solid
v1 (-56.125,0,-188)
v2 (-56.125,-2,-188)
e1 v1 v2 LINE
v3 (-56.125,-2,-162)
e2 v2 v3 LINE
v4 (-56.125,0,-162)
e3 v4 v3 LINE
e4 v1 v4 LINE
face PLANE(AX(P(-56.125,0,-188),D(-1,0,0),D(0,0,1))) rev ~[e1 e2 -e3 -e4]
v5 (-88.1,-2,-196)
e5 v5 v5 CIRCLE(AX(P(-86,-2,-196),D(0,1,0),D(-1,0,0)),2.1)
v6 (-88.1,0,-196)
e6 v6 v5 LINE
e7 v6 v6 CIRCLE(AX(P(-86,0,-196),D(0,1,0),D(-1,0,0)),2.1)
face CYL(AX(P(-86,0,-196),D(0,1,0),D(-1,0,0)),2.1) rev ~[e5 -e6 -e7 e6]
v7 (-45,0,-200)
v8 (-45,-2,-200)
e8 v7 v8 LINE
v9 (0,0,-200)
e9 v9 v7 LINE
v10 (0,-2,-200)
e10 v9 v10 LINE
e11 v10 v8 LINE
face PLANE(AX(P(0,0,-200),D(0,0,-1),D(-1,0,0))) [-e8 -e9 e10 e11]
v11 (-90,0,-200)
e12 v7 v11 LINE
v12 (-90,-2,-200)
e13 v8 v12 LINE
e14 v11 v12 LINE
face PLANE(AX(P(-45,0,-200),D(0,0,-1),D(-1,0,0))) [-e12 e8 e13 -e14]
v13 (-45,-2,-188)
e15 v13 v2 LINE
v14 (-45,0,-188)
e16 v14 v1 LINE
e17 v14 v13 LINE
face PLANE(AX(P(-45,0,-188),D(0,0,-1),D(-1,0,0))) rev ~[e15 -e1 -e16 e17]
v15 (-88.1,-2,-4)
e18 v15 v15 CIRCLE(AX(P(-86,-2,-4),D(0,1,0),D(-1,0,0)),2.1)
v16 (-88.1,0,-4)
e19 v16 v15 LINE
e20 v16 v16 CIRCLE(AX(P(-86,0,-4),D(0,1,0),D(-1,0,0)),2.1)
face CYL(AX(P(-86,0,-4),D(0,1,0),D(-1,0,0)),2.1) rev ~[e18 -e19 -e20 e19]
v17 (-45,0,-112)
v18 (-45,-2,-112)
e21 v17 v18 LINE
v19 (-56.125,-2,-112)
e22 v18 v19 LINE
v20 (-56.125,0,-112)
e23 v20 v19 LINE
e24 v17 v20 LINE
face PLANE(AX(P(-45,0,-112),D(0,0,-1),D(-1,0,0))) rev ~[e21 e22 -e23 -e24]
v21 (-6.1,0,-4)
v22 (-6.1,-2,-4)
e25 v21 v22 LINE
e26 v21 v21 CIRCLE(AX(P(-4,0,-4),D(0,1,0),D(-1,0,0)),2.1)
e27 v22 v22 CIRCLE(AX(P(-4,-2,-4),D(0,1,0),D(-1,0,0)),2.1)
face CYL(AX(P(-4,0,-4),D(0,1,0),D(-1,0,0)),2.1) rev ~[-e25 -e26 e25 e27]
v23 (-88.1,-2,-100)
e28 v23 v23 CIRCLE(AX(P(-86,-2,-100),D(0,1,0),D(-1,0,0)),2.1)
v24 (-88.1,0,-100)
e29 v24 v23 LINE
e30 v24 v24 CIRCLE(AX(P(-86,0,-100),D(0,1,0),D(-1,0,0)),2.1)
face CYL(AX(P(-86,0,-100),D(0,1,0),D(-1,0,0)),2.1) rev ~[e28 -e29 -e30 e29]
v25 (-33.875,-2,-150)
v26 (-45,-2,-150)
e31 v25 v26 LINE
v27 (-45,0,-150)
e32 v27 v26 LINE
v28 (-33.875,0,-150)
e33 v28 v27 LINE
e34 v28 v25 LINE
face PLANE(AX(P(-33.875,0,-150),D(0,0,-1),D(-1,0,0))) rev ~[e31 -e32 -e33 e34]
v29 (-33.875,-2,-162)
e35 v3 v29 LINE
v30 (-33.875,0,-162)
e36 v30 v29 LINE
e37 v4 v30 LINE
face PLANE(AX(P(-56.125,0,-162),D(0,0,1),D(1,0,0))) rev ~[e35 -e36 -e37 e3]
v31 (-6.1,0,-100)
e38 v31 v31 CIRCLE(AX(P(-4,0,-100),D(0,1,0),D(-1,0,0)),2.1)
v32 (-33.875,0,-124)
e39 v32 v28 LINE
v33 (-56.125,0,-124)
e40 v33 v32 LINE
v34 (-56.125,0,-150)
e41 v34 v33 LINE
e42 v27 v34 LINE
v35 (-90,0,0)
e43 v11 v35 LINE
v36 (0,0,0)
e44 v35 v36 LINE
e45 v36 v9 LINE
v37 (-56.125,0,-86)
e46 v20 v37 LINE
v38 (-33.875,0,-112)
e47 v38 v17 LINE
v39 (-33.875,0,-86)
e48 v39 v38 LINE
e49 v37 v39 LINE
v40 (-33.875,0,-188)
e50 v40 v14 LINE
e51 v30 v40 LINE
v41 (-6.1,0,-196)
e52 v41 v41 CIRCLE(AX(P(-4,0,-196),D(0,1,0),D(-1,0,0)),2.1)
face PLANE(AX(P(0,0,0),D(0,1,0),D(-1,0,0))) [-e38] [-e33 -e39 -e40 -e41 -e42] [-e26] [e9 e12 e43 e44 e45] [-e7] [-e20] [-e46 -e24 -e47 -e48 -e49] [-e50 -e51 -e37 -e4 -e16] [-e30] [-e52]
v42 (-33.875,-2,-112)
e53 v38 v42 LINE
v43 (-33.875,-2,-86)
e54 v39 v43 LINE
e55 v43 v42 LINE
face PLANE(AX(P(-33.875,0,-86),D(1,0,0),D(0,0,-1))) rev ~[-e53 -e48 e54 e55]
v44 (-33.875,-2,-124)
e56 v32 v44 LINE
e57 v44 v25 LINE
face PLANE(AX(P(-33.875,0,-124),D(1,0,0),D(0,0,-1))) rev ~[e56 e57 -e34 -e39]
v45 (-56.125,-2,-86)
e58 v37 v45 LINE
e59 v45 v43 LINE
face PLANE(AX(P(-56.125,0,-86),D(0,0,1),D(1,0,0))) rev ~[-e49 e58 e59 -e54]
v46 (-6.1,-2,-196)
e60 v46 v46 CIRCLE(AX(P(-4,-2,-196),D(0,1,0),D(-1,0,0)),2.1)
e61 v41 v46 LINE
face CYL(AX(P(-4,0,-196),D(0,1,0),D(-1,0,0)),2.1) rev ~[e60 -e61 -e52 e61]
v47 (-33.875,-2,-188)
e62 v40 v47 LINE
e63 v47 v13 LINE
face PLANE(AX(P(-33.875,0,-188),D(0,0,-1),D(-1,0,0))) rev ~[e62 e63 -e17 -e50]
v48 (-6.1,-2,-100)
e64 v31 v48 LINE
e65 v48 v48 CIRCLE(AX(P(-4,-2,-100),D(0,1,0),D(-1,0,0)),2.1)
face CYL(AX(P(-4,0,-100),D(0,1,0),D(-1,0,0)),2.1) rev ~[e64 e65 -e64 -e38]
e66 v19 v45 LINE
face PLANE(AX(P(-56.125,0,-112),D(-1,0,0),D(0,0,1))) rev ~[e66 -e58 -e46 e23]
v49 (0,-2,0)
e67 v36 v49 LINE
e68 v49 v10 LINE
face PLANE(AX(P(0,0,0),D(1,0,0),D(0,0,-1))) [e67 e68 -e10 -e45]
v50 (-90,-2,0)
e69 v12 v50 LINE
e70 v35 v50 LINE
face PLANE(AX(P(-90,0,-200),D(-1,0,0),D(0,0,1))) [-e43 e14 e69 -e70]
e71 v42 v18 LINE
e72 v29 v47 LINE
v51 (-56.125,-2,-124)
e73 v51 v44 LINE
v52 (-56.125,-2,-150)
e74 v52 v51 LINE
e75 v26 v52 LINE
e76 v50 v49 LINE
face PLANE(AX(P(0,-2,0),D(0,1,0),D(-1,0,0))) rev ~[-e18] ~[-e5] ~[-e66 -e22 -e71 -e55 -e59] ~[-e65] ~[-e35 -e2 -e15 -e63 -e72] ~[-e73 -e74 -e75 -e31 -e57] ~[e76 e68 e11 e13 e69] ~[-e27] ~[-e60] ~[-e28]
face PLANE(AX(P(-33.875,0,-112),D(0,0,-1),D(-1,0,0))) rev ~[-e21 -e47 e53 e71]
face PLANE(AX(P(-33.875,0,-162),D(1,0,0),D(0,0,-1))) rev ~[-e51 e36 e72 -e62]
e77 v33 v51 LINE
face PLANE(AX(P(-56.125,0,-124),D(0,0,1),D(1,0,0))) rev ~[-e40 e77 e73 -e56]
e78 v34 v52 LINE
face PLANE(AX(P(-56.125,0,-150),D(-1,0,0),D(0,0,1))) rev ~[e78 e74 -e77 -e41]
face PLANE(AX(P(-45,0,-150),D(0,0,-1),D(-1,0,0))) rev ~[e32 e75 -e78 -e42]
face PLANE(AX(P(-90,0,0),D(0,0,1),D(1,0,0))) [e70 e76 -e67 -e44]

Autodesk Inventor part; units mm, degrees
ref_plane "YZ Plane" through (0, 0, 0) normal (1, 0, 0) x (0, 1, 0)
ref_plane "XZ Plane" through (0, 0, 0) normal (0, 1, 0) x (-1, 0, 0)
ref_plane "XY Plane" through (0, 0, 0) normal (0, 0, 1) x (1, 0, 0)
sketch "Sketch1" plane through (0, 0, 0) normal (0, 1, 0) x (-1, 0, 0)
  line L0 (0, 0) -> (0, -200)
  line L1 (0, -200) -> (90, -200)
  line L2 (90, -200) -> (90, 0)
  line L3 (90, 0) -> (0, 0)
  line L4 (45, -200) -> (45, -188)
  line L5 (45, -188) -> (56.125, -188)
  line L6 (56.125, -188) -> (56.125, -162)
  line L7 (56.125, -162) -> (33.875, -162)
  line L8 (33.875, -162) -> (33.875, -188)
  line L9 (33.875, -188) -> (45, -188)
  line L10 (45, -150) -> (56.125, -150)
  line L11 (56.125, -150) -> (56.125, -124)
  line L12 (56.125, -124) -> (33.875, -124)
  line L13 (33.875, -124) -> (33.875, -150)
  line L14 (33.875, -150) -> (45, -150)
  line L15 (45, -112) -> (56.125, -112)
  line L16 (56.125, -112) -> (56.125, -86)
  line L17 (56.125, -86) -> (33.875, -86)
  line L18 (33.875, -86) -> (33.875, -112)
  line L19 (33.875, -112) -> (45, -112)
  circle A0 centre (86, -4) radius 2.1
  circle A1 centre (86, -100) radius 2.1
  circle A2 centre (86, -196) radius 2.1
  circle A3 centre (4, -4) radius 2.1
  circle A4 centre (4, -100) radius 2.1
  circle A5 centre (4, -196) radius 2.1
  dimension "d0" = 200
  dimension "d1" = 90
  dimension "d2" = 200
  dimension "d3" = 12
  dimension "d4" = 11.125
  dimension "d5" = 26
  dimension "d6" = 22.25
  dimension "d7" = 26
  dimension "d9" = 11.125
  dimension "d10" = 26
  dimension "d11" = 22.25
  dimension "d12" = 26
  dimension "d14" = 11.125
  dimension "d15" = 26
  dimension "d16" = 22.25
  dimension "d17" = 26
  dimension "d23" = 4.2
  dimension "d25" = 4.2
extrude "Extrusion1" add sketch "Sketch1" against normal blind 2
properties part number "Cover Rev 4"
